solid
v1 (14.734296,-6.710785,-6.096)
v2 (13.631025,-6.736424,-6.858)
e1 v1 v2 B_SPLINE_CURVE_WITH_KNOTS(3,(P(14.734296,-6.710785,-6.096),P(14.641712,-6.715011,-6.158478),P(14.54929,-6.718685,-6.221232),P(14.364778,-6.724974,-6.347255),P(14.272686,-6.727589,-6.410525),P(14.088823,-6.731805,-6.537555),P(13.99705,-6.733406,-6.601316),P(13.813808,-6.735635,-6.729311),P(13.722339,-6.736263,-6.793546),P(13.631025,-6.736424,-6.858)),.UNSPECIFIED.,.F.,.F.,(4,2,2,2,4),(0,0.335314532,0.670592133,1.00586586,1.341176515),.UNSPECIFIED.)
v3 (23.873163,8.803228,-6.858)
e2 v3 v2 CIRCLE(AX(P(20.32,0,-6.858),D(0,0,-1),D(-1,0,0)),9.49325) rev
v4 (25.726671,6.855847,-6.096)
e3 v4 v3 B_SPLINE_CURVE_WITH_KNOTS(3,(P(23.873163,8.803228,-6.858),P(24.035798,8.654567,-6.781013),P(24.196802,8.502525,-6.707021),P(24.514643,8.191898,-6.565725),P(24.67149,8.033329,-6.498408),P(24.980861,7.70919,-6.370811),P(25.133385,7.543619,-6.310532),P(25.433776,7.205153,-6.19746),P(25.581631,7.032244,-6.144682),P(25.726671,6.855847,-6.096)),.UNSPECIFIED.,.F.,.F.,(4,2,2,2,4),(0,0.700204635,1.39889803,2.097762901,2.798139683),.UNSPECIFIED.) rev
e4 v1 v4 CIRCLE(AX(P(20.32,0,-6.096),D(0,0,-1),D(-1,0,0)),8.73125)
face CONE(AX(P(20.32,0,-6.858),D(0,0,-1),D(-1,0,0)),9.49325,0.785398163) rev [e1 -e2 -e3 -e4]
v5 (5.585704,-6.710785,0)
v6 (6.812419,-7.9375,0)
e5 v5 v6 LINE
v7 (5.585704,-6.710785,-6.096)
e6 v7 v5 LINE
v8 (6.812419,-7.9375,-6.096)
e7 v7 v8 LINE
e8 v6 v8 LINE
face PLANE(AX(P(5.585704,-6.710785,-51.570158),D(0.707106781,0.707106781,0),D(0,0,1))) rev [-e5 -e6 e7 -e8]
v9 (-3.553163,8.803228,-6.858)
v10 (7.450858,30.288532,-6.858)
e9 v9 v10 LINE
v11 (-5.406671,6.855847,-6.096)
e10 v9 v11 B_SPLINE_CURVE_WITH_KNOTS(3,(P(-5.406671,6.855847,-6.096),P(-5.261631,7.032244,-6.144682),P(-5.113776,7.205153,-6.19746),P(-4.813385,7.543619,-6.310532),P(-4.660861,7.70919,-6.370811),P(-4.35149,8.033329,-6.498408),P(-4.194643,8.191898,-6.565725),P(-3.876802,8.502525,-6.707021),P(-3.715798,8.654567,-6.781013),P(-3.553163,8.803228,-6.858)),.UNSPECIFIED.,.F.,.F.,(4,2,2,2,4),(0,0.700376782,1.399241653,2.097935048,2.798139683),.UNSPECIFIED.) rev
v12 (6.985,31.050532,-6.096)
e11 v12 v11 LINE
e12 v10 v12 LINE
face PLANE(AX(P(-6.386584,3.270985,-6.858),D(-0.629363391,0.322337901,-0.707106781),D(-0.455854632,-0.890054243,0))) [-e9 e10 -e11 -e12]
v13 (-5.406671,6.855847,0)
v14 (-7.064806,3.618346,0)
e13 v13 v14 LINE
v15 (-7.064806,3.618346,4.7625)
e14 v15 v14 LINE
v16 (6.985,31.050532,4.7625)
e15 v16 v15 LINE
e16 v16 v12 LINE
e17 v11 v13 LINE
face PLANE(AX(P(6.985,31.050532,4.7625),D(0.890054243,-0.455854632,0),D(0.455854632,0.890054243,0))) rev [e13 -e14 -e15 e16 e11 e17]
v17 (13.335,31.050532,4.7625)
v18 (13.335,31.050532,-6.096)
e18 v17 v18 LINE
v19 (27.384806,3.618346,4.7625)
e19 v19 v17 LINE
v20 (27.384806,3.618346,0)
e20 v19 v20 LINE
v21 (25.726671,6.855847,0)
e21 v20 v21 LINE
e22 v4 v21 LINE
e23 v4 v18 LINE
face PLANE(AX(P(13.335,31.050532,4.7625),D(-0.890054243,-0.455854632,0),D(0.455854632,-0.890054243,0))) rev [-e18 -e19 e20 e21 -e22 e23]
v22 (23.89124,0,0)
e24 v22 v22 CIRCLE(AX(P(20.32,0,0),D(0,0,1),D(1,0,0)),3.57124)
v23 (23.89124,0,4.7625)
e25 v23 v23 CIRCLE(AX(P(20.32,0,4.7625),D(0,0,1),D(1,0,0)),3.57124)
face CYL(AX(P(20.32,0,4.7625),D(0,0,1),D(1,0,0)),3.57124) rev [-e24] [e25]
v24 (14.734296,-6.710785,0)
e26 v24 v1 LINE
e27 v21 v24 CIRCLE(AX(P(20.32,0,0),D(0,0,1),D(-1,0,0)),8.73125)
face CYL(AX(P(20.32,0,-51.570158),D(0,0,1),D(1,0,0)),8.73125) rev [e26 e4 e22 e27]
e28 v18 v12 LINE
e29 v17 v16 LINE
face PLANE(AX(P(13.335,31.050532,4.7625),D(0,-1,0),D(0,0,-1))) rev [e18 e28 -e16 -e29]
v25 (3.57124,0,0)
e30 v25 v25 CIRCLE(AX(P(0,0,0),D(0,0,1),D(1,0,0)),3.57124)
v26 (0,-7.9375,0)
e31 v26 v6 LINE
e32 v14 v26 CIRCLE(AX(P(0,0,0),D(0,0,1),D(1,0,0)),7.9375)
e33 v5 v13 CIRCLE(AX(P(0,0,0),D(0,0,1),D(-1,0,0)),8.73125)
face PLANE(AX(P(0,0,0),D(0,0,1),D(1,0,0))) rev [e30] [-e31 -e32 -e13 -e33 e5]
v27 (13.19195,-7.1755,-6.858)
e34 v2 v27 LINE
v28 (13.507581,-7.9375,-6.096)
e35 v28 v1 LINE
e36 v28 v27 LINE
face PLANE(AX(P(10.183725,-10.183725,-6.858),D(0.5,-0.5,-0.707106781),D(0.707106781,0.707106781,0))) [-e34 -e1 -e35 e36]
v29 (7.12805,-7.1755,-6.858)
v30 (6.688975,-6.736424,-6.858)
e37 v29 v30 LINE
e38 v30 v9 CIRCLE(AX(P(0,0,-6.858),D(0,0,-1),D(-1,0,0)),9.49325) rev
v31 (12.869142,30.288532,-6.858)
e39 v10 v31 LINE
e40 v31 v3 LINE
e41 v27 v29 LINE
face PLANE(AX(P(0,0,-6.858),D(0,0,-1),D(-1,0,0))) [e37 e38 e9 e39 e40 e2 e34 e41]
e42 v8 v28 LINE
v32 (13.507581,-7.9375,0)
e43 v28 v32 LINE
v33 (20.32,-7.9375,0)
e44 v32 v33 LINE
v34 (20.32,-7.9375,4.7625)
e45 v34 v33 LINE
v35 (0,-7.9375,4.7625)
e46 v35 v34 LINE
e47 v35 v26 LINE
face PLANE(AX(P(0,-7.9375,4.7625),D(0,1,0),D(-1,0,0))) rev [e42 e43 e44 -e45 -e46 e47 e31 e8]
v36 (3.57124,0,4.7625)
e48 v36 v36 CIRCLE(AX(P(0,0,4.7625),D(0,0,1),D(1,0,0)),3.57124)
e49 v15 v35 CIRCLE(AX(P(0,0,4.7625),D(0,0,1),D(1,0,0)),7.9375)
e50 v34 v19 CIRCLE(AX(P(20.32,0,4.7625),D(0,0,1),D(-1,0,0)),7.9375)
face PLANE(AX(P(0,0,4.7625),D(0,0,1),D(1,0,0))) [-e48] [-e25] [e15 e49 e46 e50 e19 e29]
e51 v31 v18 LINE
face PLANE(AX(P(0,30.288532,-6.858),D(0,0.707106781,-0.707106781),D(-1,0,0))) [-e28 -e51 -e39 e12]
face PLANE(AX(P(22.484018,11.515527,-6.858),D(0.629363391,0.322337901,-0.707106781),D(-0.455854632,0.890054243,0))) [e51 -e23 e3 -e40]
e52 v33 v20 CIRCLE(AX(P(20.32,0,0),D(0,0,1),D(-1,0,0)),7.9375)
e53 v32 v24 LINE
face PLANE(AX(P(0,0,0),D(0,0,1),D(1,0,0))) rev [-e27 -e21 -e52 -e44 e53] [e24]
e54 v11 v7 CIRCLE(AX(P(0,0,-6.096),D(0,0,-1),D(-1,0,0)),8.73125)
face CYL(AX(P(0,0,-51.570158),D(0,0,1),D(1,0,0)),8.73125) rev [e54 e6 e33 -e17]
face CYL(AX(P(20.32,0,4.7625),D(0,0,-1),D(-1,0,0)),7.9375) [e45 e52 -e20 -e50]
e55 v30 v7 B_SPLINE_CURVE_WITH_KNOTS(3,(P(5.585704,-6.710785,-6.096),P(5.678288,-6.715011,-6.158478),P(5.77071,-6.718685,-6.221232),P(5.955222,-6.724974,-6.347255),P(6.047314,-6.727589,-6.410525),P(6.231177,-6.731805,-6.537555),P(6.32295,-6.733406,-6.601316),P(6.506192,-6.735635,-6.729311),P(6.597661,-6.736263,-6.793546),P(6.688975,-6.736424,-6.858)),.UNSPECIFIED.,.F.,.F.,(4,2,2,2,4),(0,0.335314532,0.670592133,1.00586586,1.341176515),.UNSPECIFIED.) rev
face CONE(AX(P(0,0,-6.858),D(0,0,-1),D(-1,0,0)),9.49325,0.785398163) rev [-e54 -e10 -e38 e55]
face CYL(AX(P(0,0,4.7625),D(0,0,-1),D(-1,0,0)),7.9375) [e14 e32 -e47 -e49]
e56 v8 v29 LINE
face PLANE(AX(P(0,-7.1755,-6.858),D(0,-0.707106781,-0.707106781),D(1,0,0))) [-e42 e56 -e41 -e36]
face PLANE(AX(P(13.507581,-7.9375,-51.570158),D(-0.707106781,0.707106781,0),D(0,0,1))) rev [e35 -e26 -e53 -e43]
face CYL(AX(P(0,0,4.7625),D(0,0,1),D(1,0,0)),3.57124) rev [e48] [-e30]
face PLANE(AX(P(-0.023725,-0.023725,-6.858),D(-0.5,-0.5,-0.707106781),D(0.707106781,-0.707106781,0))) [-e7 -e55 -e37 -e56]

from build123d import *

# Parameters (mm, degrees)
BOSS_EXTRUDE1_DEPTH     = 4.7625
F_1_4_CLEARANCE_HOLE1_D = 7.14248
BOSS_EXTRUDE2_DEPTH     = 6.858
DRAFT1_ANGLE            = 30
FILLET1_R               = 12.7
BOSS_EXTRUDE3_DEPTH     = 6.858
CHAMFER2_SIZE           = 3.175
CHAMFER3_SIZE           = 3.175
CHAMFER1_SIZE           = 0.762


with BuildPart() as part:
    # Sketch1 → Boss-Extrude1 (new body)
    with BuildSketch(Plane.XY):
        with BuildLine():
            Line((0, -7.9375), (20.32, -7.9375))
            ThreePointArc((20.32, -7.9375), (27.092168365, -4.140246597), (27.38480555, 3.61834614))
            Line((27.38480555, 3.61834614), (13.335, 31.050532116))
            Line((13.335, 31.050532116), (6.985, 31.050532116))
            Line((6.985, 31.050532116), (-7.06480555, 3.61834614))
            ThreePointArc((-7.06480555, 3.61834614), (-6.772168365, -4.140246597), (0, -7.9375))
        make_face()
    extrude(amount=BOSS_EXTRUDE1_DEPTH)

    # 1/4 Clearance Hole1 (through all)
    with Locations(Plane.XY.offset(4.7625)):
        with Locations((0, 0), (20.32, 0)):
            Hole(F_1_4_CLEARANCE_HOLE1_D / 2)

    # Sketch6 → Boss-Extrude2 (add)
    with BuildSketch(Plane(origin=(0, 0, 0), x_dir=(-1, 0, 0), z_dir=(0, 0, -1))):
        Polygon((-16.866941061, 24.154432116), (-3.453058939, 24.154432116), (-6.985, 31.050532116), (-13.335, 31.050532116), align=None)
    extrude(amount=BOSS_EXTRUDE2_DEPTH)

    # Draft1
    draft1_faces = [part.faces().sort_by_distance(p)[0] for p in [
        (10.16, 24.154432116, -3.429),
    ]]
    draft(draft1_faces, Plane(origin=(0, 0, -6.858), x_dir=(-1, 0, 0), z_dir=(0, 0, -1)), DRAFT1_ANGLE)

    # Fillet1
    fillet1_edges = [part.edges().sort_by_distance(p)[0] for p in [
        (10.16, 20.19496397, 0),
    ]]
    fillet(fillet1_edges, radius=FILLET1_R)

    # Sketch7 → Boss-Extrude3 (add)
    with BuildSketch(Plane(origin=(0, 0, 0), x_dir=(-1, 0, 0), z_dir=(0, 0, -1))):
        with BuildLine():
            Line((-16.866941061, 24.154432116), (-3.453058939, 24.154432116))
            Line((-3.453058939, 24.154432116), (2.330214301, 12.862615551))
            Line((2.330214301, 12.862615551), (5.406671043, 6.85584676))
            ThreePointArc((5.406671043, 6.85584676), (-7.449385202, 4.554271257), (-3.637419458, -7.9375))
            Line((-3.637419458, -7.9375), (-16.682580542, -7.9375))
            ThreePointArc((-16.682580542, -7.9375), (-12.870614798, 4.554271257), (-25.726671043, 6.85584676))
            Line((-25.726671043, 6.85584676), (-22.650214301, 12.862615551))
            Line((-22.650214301, 12.862615551), (-16.866941061, 24.154432116))
        make_face()
    extrude(amount=BOSS_EXTRUDE3_DEPTH)

    # Chamfer2
    # the kernel refuses this chamfer: 3.175, 2.394981568 mm, written as the material it takes off along each edge
    with BuildSketch(Plane(origin=(3.637419458, -7.9375, 0), x_dir=(1, 0, 0), z_dir=(0, 0, -1))) as chamfer2_piece_1:
        with BuildLine():
            Line((CHAMFER2_SIZE, 0), (1.948284876, -1.226715124))
            ThreePointArc((1.948284876, -1.226715124), (1.002646954, -0.541250257), (0, 0))
            Line((0, 0), (CHAMFER2_SIZE, 0))
        make_face()
    extrude(amount=15.023093487, mode=Mode.SUBTRACT)

    # Chamfer3
    # the kernel refuses this chamfer: 3.175, 2.394981568 mm, written as the material it takes off along each edge
    with BuildSketch(Plane(origin=(16.682580542, -7.9375, 0), x_dir=(-1, 0, 0), z_dir=(0, 0, -1))) as chamfer3_piece_1:
        with BuildLine():
            Line((CHAMFER3_SIZE, 0), (1.948284876, 1.226715124))
            ThreePointArc((1.948284876, 1.226715124), (1.002646954, 0.541250257), (0, 0))
            Line((0, 0), (CHAMFER3_SIZE, 0))
        make_face()
    extrude(amount=15.023093487, mode=Mode.SUBTRACT)

    # Chamfer1
    chamfer1_edges = [part.edges().sort_by_distance(p)[0] for p in [
        (13.53609355, 5.496666248, -6.858),
        (6.78390645, 5.496666248, -6.858),
        (6.199061896, -7.324142438, -6.858),
        (10.16, -7.9375, -6.858),
        (14.120938104, -7.324142438, -6.858),
        (19.530835521, 18.953189438, -6.858),
        (0.789164479, 18.953189438, -6.858),
        (10.16, 31.050532116, -6.858),
    ]]
    chamfer(chamfer1_edges, length=CHAMFER1_SIZE)


solid = part.part
